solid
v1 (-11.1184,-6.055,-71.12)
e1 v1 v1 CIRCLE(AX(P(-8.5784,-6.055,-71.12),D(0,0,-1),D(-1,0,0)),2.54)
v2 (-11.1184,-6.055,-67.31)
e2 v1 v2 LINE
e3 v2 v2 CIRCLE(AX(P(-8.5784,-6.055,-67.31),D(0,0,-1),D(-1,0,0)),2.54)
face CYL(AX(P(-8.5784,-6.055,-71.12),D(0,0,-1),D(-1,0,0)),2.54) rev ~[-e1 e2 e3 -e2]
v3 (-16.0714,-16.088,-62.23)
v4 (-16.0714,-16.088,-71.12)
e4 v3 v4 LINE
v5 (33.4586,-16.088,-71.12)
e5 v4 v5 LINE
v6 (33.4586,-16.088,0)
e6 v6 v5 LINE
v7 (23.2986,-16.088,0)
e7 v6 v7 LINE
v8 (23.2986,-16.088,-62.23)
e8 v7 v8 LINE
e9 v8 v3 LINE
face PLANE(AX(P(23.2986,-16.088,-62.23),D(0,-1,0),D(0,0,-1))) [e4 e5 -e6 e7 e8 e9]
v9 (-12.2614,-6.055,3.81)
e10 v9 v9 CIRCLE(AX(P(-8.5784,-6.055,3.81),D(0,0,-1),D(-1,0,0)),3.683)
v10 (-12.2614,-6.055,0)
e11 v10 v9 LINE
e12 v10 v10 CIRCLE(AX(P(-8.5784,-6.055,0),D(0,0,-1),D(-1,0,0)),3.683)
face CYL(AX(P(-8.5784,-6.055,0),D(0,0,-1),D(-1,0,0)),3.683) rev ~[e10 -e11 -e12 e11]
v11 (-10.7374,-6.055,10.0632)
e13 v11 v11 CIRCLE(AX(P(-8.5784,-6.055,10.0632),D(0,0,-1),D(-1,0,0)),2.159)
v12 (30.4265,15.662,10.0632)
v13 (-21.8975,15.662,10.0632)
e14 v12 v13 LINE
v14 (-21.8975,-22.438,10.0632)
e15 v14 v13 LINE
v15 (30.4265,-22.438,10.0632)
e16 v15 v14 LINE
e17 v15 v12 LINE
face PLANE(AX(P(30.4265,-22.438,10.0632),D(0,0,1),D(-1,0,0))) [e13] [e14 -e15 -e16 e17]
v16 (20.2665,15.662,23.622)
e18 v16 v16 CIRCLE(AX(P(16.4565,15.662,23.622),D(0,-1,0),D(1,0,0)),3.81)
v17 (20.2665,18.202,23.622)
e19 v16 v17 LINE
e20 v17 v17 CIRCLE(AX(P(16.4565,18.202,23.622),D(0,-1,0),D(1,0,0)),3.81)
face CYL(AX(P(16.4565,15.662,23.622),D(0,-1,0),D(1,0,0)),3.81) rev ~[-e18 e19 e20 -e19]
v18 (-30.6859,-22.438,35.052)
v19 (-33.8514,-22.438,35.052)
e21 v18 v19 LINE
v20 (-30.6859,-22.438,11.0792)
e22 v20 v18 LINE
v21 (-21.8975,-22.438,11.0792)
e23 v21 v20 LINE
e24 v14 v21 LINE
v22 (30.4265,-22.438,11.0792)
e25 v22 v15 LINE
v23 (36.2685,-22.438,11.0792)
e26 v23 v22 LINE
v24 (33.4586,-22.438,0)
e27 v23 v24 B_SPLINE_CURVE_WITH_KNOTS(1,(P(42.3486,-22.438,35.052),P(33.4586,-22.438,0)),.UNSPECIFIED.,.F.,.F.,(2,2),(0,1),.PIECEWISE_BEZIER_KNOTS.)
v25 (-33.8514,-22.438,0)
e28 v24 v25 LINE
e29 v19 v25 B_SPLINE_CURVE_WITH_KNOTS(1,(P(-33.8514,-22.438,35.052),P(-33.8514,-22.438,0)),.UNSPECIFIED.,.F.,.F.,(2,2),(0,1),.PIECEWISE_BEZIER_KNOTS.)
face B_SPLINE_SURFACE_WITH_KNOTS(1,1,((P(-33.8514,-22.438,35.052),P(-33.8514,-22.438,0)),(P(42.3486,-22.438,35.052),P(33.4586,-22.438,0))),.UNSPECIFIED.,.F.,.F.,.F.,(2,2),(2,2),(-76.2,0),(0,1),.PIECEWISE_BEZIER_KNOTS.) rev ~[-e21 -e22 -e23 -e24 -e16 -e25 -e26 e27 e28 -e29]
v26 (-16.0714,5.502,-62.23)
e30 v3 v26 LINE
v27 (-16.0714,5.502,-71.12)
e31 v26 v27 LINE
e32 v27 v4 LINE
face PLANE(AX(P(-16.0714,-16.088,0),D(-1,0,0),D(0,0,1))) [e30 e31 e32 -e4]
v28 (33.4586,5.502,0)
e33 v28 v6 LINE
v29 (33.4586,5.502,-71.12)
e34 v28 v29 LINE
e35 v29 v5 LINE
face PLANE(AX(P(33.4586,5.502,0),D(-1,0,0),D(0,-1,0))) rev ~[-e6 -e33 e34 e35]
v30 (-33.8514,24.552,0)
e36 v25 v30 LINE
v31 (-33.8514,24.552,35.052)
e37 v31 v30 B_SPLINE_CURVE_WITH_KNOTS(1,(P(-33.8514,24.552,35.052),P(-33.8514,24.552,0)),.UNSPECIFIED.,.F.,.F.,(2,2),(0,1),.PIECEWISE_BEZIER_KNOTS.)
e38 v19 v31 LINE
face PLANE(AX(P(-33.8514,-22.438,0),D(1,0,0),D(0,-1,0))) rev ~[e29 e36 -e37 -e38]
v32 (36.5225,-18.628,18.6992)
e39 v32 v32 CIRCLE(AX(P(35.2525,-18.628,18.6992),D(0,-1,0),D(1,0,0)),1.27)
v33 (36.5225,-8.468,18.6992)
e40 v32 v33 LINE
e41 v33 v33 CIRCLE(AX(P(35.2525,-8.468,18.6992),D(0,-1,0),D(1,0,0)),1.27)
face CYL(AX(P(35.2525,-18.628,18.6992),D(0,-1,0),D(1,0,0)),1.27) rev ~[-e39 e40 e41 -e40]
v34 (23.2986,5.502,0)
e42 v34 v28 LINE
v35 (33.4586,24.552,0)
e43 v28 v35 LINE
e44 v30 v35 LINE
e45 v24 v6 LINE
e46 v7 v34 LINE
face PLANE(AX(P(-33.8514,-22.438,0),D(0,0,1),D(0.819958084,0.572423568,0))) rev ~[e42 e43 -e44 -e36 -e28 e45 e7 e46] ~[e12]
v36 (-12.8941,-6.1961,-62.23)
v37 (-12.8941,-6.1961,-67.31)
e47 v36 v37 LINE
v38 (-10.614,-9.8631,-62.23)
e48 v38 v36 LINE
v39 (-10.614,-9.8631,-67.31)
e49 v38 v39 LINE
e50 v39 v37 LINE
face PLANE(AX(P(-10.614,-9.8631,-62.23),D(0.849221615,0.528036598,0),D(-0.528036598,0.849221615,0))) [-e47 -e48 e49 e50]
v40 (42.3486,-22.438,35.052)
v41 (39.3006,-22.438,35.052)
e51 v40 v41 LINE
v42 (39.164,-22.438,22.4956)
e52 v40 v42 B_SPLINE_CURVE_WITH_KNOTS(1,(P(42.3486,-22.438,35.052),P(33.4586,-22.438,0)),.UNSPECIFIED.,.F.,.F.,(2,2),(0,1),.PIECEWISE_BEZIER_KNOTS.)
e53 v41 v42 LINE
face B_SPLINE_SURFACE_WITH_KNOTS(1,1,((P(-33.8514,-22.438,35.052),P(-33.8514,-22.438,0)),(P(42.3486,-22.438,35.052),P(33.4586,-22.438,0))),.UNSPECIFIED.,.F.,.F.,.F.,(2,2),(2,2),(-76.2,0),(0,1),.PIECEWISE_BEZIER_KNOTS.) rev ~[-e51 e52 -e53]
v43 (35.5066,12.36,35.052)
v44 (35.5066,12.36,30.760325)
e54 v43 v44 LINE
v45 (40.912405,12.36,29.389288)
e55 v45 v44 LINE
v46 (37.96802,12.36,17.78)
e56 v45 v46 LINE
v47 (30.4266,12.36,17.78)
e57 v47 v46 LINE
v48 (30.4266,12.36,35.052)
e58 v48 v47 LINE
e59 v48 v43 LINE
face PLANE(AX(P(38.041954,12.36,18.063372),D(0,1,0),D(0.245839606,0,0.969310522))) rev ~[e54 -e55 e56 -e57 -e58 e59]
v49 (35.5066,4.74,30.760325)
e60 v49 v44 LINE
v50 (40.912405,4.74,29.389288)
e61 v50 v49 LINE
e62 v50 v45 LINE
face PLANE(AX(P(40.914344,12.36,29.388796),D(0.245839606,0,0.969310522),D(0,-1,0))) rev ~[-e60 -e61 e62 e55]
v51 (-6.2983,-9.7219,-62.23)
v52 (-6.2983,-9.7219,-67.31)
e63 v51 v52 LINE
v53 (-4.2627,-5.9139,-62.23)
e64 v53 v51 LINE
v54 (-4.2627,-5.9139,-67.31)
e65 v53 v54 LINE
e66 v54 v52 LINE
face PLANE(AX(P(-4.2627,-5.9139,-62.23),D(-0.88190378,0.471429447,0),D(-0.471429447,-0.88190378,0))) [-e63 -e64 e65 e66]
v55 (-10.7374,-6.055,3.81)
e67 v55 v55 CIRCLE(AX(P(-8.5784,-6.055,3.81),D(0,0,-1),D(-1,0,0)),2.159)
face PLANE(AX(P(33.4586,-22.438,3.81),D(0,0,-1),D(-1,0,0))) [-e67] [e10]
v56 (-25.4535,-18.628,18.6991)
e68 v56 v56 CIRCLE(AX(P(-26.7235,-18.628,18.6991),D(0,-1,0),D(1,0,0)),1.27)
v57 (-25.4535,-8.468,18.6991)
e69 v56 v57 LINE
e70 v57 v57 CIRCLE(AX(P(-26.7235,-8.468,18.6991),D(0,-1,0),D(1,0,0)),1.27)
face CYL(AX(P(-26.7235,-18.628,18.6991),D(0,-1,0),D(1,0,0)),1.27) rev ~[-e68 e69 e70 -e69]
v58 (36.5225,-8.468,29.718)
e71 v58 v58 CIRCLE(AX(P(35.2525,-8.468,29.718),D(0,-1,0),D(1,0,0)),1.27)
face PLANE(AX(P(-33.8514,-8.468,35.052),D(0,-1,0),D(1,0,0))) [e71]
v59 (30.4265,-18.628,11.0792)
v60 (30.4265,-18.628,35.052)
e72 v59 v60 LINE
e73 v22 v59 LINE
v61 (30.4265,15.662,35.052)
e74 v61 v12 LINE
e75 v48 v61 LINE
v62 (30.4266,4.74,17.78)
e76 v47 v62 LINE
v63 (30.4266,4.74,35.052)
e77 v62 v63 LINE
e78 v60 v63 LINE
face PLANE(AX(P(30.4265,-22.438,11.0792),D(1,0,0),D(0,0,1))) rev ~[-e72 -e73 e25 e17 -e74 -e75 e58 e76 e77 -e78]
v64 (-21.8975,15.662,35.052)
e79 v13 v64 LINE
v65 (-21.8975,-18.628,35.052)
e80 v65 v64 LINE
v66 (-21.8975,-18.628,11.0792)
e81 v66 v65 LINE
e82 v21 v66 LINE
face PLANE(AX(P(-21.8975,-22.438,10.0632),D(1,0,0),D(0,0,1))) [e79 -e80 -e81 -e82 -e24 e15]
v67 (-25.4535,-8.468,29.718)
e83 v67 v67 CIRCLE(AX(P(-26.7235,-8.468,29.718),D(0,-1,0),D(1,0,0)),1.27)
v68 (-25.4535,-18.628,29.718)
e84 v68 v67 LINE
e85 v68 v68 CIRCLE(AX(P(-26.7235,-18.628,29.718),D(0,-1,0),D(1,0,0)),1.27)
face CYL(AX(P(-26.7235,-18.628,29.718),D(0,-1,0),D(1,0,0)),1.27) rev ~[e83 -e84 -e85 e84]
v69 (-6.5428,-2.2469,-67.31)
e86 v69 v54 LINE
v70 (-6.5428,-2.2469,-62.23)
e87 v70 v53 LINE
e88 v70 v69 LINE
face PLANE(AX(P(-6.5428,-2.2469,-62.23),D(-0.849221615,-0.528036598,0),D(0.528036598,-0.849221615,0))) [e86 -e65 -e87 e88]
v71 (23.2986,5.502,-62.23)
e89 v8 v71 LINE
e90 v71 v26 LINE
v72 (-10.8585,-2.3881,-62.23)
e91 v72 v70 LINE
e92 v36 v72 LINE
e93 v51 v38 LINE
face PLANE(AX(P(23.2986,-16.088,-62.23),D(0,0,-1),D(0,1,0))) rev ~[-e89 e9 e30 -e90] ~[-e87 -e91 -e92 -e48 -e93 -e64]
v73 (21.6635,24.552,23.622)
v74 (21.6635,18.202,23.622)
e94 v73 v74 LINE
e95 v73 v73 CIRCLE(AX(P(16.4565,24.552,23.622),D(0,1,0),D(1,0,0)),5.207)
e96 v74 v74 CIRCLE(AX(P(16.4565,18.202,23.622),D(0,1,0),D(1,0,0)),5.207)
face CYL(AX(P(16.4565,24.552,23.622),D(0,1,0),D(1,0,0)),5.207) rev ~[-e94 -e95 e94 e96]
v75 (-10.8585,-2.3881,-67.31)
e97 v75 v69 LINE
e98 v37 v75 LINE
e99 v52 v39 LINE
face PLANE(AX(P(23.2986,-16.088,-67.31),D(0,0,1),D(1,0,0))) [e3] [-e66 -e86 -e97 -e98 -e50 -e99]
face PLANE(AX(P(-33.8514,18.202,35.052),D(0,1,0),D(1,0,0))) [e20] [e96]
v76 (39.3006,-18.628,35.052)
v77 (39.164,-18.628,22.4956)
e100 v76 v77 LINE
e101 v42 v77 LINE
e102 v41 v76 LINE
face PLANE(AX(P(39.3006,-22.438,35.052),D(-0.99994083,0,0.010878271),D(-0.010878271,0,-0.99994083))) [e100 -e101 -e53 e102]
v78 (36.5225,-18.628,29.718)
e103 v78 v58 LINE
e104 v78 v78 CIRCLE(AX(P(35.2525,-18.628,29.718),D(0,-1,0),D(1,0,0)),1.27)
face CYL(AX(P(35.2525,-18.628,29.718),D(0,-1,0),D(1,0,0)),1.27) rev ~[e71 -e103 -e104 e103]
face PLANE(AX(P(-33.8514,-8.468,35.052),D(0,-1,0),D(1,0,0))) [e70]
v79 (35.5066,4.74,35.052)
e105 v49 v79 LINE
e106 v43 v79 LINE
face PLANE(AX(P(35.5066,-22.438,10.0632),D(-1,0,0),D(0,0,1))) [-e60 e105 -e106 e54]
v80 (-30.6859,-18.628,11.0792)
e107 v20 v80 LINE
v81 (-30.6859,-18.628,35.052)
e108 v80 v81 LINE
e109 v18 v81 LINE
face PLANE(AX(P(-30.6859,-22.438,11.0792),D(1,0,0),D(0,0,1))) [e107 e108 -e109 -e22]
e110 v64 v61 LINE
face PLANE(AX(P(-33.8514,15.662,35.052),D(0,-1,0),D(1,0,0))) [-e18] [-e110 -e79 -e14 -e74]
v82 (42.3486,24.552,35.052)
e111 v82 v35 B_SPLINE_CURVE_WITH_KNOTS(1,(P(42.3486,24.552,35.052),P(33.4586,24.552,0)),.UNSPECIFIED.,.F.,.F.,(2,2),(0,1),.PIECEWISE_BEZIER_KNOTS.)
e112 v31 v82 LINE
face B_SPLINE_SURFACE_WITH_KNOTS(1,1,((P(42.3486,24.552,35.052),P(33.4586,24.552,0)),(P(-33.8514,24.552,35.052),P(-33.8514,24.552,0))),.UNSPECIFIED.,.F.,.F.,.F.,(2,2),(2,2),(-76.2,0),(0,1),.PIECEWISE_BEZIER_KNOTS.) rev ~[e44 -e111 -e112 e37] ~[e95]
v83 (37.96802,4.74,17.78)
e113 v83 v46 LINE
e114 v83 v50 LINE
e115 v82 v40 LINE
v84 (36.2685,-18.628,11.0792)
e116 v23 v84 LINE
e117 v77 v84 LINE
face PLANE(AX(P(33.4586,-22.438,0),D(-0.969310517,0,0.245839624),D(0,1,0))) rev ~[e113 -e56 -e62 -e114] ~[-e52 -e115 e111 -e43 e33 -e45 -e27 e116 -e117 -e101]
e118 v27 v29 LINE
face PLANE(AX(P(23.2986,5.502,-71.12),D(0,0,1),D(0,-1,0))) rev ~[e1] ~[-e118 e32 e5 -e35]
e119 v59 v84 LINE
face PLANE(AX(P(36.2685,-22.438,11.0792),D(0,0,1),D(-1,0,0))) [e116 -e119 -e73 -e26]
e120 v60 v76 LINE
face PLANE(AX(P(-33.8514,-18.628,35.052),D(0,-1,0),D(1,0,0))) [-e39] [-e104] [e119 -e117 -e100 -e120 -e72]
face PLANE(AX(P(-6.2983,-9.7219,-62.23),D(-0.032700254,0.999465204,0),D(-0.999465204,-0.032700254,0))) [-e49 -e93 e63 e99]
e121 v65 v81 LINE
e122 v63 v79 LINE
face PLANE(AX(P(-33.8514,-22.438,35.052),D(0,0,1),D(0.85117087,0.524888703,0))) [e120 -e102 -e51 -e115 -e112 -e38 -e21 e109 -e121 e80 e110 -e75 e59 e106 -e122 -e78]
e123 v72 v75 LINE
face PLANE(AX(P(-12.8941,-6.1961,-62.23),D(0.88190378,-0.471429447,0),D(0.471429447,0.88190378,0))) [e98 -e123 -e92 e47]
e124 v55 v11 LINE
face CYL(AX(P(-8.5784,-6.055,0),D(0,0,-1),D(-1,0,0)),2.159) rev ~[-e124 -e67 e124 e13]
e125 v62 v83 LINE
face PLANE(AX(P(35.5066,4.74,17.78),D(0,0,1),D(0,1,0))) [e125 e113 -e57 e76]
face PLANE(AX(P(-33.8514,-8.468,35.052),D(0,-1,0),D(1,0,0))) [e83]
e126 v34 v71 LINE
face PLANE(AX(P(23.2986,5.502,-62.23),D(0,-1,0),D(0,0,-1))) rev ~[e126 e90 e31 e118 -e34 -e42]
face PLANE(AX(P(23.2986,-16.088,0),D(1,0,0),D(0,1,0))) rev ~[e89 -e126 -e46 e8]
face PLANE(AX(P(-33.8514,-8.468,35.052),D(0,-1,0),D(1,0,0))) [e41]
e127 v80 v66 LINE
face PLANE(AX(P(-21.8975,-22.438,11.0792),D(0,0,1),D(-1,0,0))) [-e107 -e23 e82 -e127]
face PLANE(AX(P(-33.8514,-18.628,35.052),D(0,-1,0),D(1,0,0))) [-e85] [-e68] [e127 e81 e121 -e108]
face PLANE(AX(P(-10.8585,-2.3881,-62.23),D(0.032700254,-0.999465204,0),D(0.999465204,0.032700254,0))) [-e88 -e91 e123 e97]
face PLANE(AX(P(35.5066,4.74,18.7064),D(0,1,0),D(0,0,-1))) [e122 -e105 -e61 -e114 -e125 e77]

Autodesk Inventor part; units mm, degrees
ref_plane "YZ Plane" through (0, 0, 0) normal (1, 0, 0) x (0, 1, 0)
ref_plane "XZ Plane" through (0, 0, 0) normal (0, 1, 0) x (-1, 0, 0)
sketch "Sketch1" plane through (0, 0, 0) normal (0, 0, 1) x (1, 0, 0)
  line L0 (-33.8514, 24.552) -> (33.4586, 24.552)
  line L1 (33.4586, 24.552) -> (33.4586, -22.438)
  line L2 (33.4586, -22.438) -> (-33.8514, -22.438)
  line L3 (-33.8514, -22.438) -> (-33.8514, 24.552)
  line L4 (33.4586, -22.438) -> (33.4586, -16.088)
  line L5 (33.4586, -16.088) -> (23.2986, -16.088)
  line L6 (23.2986, -16.088) -> (23.2986, 5.502)
  line L7 (23.2986, 5.502) -> (33.4586, 5.502)
  point P0 (0, 0)
  dimension "d0" = 67.31
  dimension "d1" = 46.99
  dimension "d10" = 6.35
  dimension "d11" = 10.16
  dimension "d12" = 21.59
ref_plane "Work Plane3" through (-33.8514, -22.438, 0) normal (0, 0, 1) x (0, 1, 0)
ref_plane "Work Plane4" through (-33.8514, -22.438, 35.052) normal (0, 0, 1) x (0, 1, 0)
sketch "Sketch3" plane through (-33.8514, -22.438, 35.052) normal (0, 0, 1) x (0, 1, 0)
  line L0 (0, 0) -> (46.99, 0)
  line L1 (46.99, 0) -> (46.99, -76.2)
  line L2 (46.99, -76.2) -> (0, -76.2)
  line L3 (0, -76.2) -> (0, 0)
  point P0 (22.438, -33.8514)
  dimension "d4" = 46.99
  dimension "d5" = 76.2
loft "Loft1" add profiles "Sketch3", "Sketch1"
sketch "Sketch5" plane through (33.4586, -22.438, 0) normal (0, 0, -1) x (-1, 0, 0)
  line L0 (67.31, 0) -> (67.31, 46.99) projected
  line L1 (-8.89, 0) -> (67.31, 0) projected
  circle A0 centre (42.037, 16.383) radius 3.683
  circle A1 centre (42.037, 16.383) radius 2.159
  point P0 (33.4586, 22.438)
  dimension "d17" = 7.366
  dimension "d20" = 4.318
extrude "Extrusion1" add sketch "Sketch1" against normal blind 71.12 contours L1 L5 L6 L7
extrude "Extrusion4" cut sketch "Sketch5" along normal through all both and the other way through all contours A1
extrude "Extrusion5" cut sketch "Sketch5" against normal blind 3.81 contours A0 | A1
sketch "Sketch7" plane through (23.2986, -16.088, 0) normal (-1, 0, 0) x (0, 0, 1)
  point P0 (0, 16.088)
sketch "Sketch8" plane through (23.2986, -16.088, 0) normal (-1, 0, 0) x (0, 0, 1)
  line L0 (0, 0) -> (-71.12, 0) projected
  line L1 (0, 21.59) -> (-71.12, 21.59) projected
  line L2 (-71.12, 0) -> (-62.23, 0)
  line L3 (-62.23, 0) -> (-62.23, 21.59)
  line L4 (-62.23, 21.59) -> (-71.12, 21.59)
  line L5 (-71.12, 21.59) -> (-71.12, 0)
  point P0 (0, 16.088)
  dimension "d27" = 8.89
extrude "Extrusion6" add sketch "Sketch8" along normal blind 39.37
sketch "Sketch9" plane through (0, 0, -71.12) normal (0, 0, -1) x (-1, 0, 0)
  line L0 (16.0714, 5.502) -> (16.0714, -16.088) projected
  line L1 (-33.4586, -16.088) -> (16.0714, -16.088) projected
  circle A0 centre (8.5784, -6.055) radius 2.54
  point P0 (0, 0)
  dimension "d34" = 5.08
extrude "Extrusion7" cut sketch "Sketch9" against normal blind 39.37
sketch "Sketch10" plane through (-33.8514, -22.438, 35.052) normal (0, -1, 0) x (1, 0, 0)
  line L0 (67.31, -35.052) -> (67.31, -106.172) projected
  line L1 (67.31, -35.052) -> (70.1199, -23.9728)
  line L2 (76.2, 0) -> (67.31, -35.052) projected
  line L3 (70.1199, -23.9728) -> (64.2779, -23.9728)
  line L4 (64.2779, -23.9728) -> (64.2779, -24.9888)
  line L5 (64.2779, -24.9888) -> (11.9539, -24.9888)
  line L6 (11.9539, -24.9888) -> (11.9539, -23.9728)
  line L7 (11.9539, -23.9728) -> (3.1655, -23.9728)
  line L8 (3.1655, -23.9728) -> (3.1655, 0)
  line L9 (0, 0) -> (76.2, 0) projected
  line L10 (76.2, 0) -> (73.0154, -12.5564)
  line L11 (76.2, 0) -> (73.152, 0)
  line L12 (73.152, 0) -> (73.0154, -12.5564)
  line L13 (73.0154, -12.5564) -> (70.1199, -23.9728)
  line L14 (73.152, 0) -> (3.1655, 0)
  line L15 (11.9539, -23.9728) -> (11.9539, 0)
  line L16 (64.2779, -23.9728) -> (64.2779, 0)
  line L17 (11.9539, 0) -> (7.1279, 0)
  circle A0 centre (7.1279, -5.334) radius 1.27
  line L18 (11.9539, -23.9728) -> (7.1279, -23.9728)
  circle A1 centre (7.1279, -16.3528) radius 1.27
  line L19 (73.152, 0) -> (68.326, 0)
  line L20 (64.2779, 0) -> (69.1039, 0)
  circle A2 centre (69.1039, -5.334) radius 1.27
  line L21 (64.2779, -23.9728) -> (69.1039, -23.9728)
  circle A3 centre (69.1039, -16.3528) radius 1.27
  point P0 (33.8514, -35.052)
  point P1 (64.2779, 0)
  point P2 (11.9539, 0)
  dimension "d37" = 11.43
  dimension "d38" = 5.842
  dimension "d39" = 1.016
  dimension "d40" = 52.324
  dimension "d41" = 8.7884
  dimension "d42" = 12.954
  dimension "d43" = 3.048
  dimension "d48" = 4.826
  dimension "d50" = 2.54
  dimension "d52" = 2.54
  dimension "d56" = 4.826
  dimension "d58" = 2.54
  dimension "d59" = 4.826
  dimension "d61" = 2.54
extrude "Extrusion8" cut sketch "Sketch10" against normal blind 38.1 contours L4 L5 L6 L15 L9 L16
extrude "Extrusion9" cut sketch "Sketch10" against normal blind 3.81 contours L2 L3 L16 L9 L12 | L15 L7 L8 L9 | A0 | A1 | A2 | A3
sketch "Sketch15" plane through (-33.8514, -18.628, 35.052) normal (0, -1, 0) x (1, 0, 0)
  line L0 (11.9539, -24.9888) -> (11.9539, 0) projected
  line L1 (11.9539, -23.9729) -> (11.9539, -16.3529)
  line L2 (11.9539, -16.3529) -> (7.1279, -16.3529)
  circle A0 centre (7.1279, -16.3529) radius 1.27
  line L3 (11.9539, 0) -> (64.2779, 0) projected
  line L4 (11.9539, 0) -> (7.1279, 0)
  line L5 (3.1655, 0) -> (11.9539, 0) projected
  circle A1 centre (7.1279, -5.334) radius 1.27
  point P0 (33.8514, -35.052)
  dimension "d64" = 7.62
  dimension "d65" = 4.826
  dimension "d66" = 2.54
  dimension "d70" = 2.54
extrude "Extrusion11" cut sketch "Sketch15" against normal blind 10.16 contours A0
sketch "Sketch14" plane through (-33.8514, -18.628, 35.052) normal (0, -1, 0) x (1, 0, 0)
  point P0 (33.8514, -35.052)
extrude "Extrusion12" cut sketch "Sketch15" against normal blind 10.16 contours A1
sketch "Sketch16" plane through (-33.8514, -18.628, 35.052) normal (0, -1, 0) x (1, 0, 0)
  line L0 (11.9539, 0) -> (64.2779, 0) projected
  line L1 (64.2779, 0) -> (69.1039, 0)
  line L2 (0, 0) -> (76.2, 0) projected
  circle A0 centre (69.1039, -5.334) radius 1.27
  line L3 (64.2779, -23.9728) -> (64.2779, -24.9888) projected
  line L4 (64.2779, -23.9728) -> (69.1039, -23.9728)
  line L5 (70.1199, -23.9728) -> (64.2779, -23.9728) projected
  circle A1 centre (69.1039, -16.3528) radius 1.27
  point P0 (33.8514, -35.052)
  dimension "d73" = 4.826
  dimension "d75" = 2.54
  dimension "d76" = 4.826
  dimension "d78" = 2.54
extrude "Extrusion13" cut sketch "Sketch16" against normal blind 10.16
sketch "Sketch17" plane through (-33.8514, 15.662, 35.052) normal (0, -1, 0) x (1, 0, 0)
  line L0 (64.2779, -23.9728) -> (64.2779, 0) projected
  line L1 (64.2779, 0) -> (50.3079, 0)
  line L2 (11.9539, 0) -> (64.2779, 0) projected
  circle A0 centre (50.3079, -11.43) radius 3.81
  point P0 (33.8514, -35.052)
  dimension "d81" = 13.97
  dimension "d83" = 7.62
extrude "Extrusion14" cut sketch "Sketch17" against normal through all
sketch "Sketch18" plane through (-33.8514, 24.552, 35.052) normal (0, 1, 0) x (1, 0, 0)
  circle A0 centre (50.3079, 11.43) radius 3.81 projected
  circle A1 centre (50.3079, 11.43) radius 5.207
  point P0 (33.8514, 35.052)
  dimension "d86" = 10.414
extrude "Extrusion15" cut sketch "Sketch18" against normal blind 6.35 contours A0 | A1
sketch "Sketch19" plane through (30.4266, -22.438, 10.0632) normal (-1, 0, 0) x (0, 0, 1)
  line L0 (24.9888, 38.1) -> (0, 38.1) projected
  line L1 (24.9888, 38.1) -> (24.9888, 3.81) projected
  line L2 (24.9888, 34.798) -> (7.7168, 34.798)
  line L3 (7.7168, 34.798) -> (7.7168, 27.178)
  line L4 (7.7168, 27.178) -> (24.9888, 27.178)
  point P0 (-10.0632, 22.438)
  dimension "d89" = 3.302
  dimension "d90" = 17.272
  dimension "d91" = 7.62
extrude "Extrusion16" cut sketch "Sketch19" against normal blind 5.08
sketch "Sketch20" plane through (42.3486, -22.438, 35.052) normal (0.9693105, 0, -0.2458396) x (-0.2458396, 0, -0.9693105)
  line L0 (0, 46.99) -> (36.1618, 46.99) projected
  line L1 (0, 46.99) -> (0, 34.798)
  line L2 (0, 46.99) -> (0, 0) projected
  line L3 (0, 34.798) -> (5.842, 34.798) construction
  line L4 (5.842, 34.798) -> (5.842, 27.178)
  line L5 (5.842, 27.178) -> (17.526, 27.178)
  line L6 (17.526, 27.178) -> (17.526, 34.798)
  line L7 (17.526, 34.798) -> (5.842, 34.798)
  point P0 (44.3872, 22.438)
  dimension "d94" = 12.192
  dimension "d98" = 11.684
extrude "Extrusion17" cut sketch "Sketch20" against normal blind 11.938
sketch "Sketch21" plane through (35.5066, -22.438, 10.0632) normal (-1, 0, 0) x (0, 0, 1)
  line L0 (7.7168, 27.178) -> (7.7168, 34.798) projected
  line L1 (7.7168, 34.798) -> (8.6432, 34.798) projected
  line L2 (7.7168, 34.798) -> (8.6432, 34.798)
  line L3 (8.6432, 27.178) -> (8.6432, 34.798) projected
  line L4 (8.6432, 34.798) -> (8.6432, 27.178)
  line L5 (24.9888, 27.178) -> (7.7168, 27.178) projected
  line L6 (8.6432, 27.178) -> (7.7168, 27.178)
  line L7 (7.7168, 27.178) -> (7.7168, 34.798)
  point P0 (-10.0632, 22.438)
extrude "Extrusion18" cut sketch "Sketch21" against normal blind 11.938
sketch "Sketch22" plane through (23.2986, -16.088, -62.23) normal (0, 0, 1) x (1, 0, 0)
  circle A0 centre (-31.877, 10.033) radius 2.54 projected
  line L0 (-29.5969, 6.3661) -> (-33.9126, 6.2249)
  line L1 (-33.9126, 6.2249) -> (-36.1927, 9.8919)
  line L2 (-36.1927, 9.8919) -> (-34.1571, 13.6999)
  line L3 (-34.1571, 13.6999) -> (-29.8414, 13.8411)
  line L4 (-29.8414, 13.8411) -> (-27.5613, 10.1741)
  line L5 (-27.5613, 10.1741) -> (-29.5969, 6.3661)
  point P0 (-23.2986, 16.088)
extrude "Extrusion20" cut sketch "Sketch22" against normal blind 5.08 contours A0 | L0 L1 L2 L3 L4 L5
